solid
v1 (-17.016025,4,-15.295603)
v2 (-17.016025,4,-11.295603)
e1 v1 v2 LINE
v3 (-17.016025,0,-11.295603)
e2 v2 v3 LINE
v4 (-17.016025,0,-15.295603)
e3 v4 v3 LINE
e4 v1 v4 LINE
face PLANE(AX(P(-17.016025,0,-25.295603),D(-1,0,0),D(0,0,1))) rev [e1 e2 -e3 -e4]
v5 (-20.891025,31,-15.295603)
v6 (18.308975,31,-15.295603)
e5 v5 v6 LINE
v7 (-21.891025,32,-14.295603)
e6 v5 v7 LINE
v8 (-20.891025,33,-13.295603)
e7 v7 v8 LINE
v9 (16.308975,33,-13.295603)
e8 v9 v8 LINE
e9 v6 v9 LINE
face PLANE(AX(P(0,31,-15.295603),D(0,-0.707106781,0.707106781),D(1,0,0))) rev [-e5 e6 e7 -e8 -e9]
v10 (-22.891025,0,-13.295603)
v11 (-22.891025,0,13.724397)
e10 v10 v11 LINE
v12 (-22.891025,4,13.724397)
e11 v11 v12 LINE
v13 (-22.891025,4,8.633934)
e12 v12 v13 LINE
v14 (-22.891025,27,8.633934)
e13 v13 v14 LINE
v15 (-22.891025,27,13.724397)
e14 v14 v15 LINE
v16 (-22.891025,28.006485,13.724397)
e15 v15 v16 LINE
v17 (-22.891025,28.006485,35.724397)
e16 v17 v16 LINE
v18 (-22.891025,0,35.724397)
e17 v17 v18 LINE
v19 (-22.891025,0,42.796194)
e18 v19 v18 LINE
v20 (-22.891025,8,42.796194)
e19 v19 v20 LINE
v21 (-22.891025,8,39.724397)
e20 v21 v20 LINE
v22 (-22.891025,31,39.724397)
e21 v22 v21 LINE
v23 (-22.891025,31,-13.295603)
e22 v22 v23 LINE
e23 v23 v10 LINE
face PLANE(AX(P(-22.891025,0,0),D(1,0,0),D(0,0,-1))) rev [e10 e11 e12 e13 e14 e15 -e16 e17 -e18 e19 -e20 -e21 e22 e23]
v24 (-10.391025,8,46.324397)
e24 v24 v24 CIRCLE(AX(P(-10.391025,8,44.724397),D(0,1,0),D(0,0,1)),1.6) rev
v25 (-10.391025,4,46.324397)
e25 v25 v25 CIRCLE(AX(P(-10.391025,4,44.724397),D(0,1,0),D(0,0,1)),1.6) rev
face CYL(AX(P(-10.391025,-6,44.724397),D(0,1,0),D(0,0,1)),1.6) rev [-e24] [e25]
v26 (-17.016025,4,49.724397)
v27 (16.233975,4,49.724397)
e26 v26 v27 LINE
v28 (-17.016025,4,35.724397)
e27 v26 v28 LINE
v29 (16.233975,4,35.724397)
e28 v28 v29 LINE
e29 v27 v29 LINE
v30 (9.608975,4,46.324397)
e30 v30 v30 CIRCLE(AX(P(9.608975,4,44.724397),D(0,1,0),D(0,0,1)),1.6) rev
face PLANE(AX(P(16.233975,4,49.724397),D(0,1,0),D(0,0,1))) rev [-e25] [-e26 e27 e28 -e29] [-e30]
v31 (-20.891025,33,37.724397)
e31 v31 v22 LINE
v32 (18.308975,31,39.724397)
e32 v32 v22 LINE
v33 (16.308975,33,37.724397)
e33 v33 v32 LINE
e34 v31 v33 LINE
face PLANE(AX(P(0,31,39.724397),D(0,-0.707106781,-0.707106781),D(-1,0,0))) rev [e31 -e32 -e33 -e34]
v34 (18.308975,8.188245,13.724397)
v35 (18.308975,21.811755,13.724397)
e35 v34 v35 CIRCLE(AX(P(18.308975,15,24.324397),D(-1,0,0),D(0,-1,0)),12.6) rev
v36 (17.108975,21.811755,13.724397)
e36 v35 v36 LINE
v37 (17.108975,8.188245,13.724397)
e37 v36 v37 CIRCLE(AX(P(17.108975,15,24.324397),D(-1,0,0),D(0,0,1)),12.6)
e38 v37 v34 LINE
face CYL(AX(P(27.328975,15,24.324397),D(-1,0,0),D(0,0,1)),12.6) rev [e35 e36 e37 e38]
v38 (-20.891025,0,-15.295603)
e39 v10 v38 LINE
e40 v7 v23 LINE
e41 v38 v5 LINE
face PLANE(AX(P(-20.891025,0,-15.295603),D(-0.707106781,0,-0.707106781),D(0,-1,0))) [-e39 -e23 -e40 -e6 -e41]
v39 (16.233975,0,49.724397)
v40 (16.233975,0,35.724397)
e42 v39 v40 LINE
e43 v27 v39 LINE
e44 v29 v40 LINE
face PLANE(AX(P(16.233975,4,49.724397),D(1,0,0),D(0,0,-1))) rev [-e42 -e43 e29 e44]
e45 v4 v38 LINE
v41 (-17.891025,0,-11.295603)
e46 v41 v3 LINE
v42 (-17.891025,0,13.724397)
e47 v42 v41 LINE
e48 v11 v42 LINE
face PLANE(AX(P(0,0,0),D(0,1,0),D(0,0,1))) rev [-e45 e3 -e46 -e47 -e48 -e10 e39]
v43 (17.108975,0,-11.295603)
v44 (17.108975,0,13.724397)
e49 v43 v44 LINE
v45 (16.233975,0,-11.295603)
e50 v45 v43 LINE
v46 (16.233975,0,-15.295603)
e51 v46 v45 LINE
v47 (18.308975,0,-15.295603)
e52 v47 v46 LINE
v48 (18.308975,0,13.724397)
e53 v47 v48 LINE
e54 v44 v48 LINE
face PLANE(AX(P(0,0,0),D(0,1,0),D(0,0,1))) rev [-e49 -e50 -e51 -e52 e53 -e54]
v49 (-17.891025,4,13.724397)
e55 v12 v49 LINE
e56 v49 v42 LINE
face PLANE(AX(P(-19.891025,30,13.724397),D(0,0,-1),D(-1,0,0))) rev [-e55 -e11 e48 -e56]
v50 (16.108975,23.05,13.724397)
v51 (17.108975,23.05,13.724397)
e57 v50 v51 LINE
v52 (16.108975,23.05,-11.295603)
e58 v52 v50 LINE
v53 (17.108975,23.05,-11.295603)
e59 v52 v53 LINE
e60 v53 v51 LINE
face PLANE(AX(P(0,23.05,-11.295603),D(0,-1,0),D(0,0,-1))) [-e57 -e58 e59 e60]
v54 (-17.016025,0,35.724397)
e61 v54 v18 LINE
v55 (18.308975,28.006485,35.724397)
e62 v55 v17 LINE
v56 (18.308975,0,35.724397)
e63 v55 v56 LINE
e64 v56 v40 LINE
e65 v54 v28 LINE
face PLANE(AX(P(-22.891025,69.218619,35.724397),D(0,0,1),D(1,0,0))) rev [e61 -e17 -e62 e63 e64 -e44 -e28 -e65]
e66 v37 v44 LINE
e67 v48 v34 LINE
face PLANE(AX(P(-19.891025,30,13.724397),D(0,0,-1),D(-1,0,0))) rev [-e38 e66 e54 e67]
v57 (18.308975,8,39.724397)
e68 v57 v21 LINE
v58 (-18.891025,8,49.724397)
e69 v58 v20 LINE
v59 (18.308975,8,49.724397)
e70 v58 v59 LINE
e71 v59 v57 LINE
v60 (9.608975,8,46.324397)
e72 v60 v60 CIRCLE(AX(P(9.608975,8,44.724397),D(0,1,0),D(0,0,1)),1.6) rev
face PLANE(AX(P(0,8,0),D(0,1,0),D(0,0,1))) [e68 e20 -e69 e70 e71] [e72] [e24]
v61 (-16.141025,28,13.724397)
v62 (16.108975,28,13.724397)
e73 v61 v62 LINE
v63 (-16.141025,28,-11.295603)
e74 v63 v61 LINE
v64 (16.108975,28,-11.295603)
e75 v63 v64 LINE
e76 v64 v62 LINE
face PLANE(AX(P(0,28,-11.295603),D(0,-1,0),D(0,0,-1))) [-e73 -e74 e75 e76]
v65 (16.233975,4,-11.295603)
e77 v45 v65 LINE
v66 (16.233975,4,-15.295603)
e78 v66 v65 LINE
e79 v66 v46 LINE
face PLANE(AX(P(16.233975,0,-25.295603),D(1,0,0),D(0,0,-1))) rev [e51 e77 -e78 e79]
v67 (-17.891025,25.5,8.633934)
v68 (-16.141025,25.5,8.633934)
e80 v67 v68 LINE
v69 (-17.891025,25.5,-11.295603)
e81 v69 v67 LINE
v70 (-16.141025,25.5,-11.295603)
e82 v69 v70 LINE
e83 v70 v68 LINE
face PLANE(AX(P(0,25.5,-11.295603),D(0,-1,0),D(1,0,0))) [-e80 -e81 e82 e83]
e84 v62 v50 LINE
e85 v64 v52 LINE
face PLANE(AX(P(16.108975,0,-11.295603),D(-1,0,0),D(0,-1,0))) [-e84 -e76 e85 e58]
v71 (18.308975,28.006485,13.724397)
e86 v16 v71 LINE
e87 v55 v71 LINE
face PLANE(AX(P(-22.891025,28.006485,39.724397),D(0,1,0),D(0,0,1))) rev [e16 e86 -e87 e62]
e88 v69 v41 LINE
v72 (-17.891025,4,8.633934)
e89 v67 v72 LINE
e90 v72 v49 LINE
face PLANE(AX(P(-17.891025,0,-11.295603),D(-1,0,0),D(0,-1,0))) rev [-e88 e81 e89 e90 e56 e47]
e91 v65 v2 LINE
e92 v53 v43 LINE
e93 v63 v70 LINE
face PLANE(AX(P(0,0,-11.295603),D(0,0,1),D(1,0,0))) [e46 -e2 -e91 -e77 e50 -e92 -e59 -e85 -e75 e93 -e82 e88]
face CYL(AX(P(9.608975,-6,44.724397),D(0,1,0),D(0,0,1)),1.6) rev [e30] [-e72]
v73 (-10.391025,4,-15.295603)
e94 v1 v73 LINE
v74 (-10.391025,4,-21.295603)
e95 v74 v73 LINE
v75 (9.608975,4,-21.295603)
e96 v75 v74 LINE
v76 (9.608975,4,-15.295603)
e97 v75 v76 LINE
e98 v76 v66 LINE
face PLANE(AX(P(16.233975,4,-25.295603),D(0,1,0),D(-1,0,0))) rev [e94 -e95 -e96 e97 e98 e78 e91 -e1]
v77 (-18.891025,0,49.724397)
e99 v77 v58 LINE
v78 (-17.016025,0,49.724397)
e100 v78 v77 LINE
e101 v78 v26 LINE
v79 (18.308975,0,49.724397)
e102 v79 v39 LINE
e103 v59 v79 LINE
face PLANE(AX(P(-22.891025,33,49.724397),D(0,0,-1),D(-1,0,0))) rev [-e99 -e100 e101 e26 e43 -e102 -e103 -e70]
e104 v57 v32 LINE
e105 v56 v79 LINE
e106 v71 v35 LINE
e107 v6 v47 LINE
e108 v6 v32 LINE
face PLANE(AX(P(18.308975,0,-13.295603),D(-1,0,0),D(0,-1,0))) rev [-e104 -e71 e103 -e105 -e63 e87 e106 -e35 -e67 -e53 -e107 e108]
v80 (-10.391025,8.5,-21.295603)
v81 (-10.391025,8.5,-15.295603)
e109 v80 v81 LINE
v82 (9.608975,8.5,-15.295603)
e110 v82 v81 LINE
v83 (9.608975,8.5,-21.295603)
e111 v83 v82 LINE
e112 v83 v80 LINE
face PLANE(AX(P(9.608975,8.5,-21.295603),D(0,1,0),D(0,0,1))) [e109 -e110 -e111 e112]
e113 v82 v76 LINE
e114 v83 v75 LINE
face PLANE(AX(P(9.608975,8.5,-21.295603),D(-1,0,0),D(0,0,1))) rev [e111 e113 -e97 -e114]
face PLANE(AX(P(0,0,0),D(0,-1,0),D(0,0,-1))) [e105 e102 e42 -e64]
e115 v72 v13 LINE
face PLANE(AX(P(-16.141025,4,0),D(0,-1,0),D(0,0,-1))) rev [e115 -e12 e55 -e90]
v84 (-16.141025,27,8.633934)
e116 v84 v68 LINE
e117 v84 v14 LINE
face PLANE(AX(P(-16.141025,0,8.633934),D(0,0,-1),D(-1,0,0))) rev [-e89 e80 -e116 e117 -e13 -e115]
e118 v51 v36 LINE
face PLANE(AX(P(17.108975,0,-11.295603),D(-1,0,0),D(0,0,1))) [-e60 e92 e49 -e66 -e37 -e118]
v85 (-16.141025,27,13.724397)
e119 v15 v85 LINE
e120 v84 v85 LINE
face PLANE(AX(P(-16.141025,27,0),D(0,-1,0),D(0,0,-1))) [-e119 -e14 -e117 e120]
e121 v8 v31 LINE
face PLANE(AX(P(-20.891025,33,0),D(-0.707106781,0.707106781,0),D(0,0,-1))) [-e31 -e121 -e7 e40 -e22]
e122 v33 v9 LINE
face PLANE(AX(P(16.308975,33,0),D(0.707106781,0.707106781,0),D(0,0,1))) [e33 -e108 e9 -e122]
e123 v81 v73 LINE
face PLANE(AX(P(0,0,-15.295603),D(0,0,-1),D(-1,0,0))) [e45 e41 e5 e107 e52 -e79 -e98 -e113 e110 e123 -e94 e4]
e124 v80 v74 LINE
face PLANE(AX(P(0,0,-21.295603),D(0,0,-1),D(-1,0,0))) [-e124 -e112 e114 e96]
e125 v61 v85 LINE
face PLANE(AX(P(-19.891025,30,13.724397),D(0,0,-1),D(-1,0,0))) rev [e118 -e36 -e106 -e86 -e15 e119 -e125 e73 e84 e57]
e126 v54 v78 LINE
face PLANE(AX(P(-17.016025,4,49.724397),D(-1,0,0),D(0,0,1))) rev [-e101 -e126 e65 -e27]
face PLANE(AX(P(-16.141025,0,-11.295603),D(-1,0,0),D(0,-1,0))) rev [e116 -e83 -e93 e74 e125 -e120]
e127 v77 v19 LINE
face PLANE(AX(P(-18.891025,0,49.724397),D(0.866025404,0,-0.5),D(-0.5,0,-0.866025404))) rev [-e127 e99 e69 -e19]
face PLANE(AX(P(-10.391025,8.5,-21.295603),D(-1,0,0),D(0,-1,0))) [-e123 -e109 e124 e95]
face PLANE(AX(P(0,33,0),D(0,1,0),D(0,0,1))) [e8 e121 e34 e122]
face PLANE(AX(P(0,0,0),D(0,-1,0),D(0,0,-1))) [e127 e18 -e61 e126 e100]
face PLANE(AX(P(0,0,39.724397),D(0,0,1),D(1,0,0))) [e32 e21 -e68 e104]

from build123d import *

# Parameters (mm, degrees)
SKETCH1_W                = 39
SKETCH1_H                = 49.22
BOSS_EXTRUDE2_DEPTH      = 30
SKETCH3_W                = 1.75
SKETCH3_H                = 20
SKETCH3_W_2              = 1
SKETCH3_H_2              = 15.1
CUT_EXTRUDE3_DEPTH       = 47.22
CUT_EXTRUDE4_DEPTH       = 47.22
CUT_EXTRUDE5_DEPTH       = 3.75
SKETCH9_W                = 22.2
SKETCH9_H                = 30
CUT_EXTRUDE7_DEPTH       = 61.922592565
SKETCH11_W               = 0.8
SKETCH11_H               = 21.811754546
SKETCH11_H_2             = 8.188245454
CUT_EXTRUDE8_DEPTH       = 46.008146799
SKETCH12_W               = 23
SKETCH12_H               = 2.5
BOSS_EXTRUDE3_DEPTH      = 3
SKETCH13_W               = 23
SKETCH13_H               = 2.5
BOSS_EXTRUDE4_DEPTH      = 3
BOSS_EXTRUDE5_REACH      = 51.909
SKETCH14_W               = 27.02
SKETCH14_H               = 3
SKETCH15_W               = 30.25
SKETCH15_H               = 3
CUT_EXTRUDE9_DEPTH       = 25.02
SKETCH16_W               = 30.25
SKETCH16_H               = 3
CUT_EXTRUDE10_DEPTH      = 46.276919382
SKETCH24_W               = 23
SKETCH24_H               = 2.5
BOSS_EXTRUDE8_DEPTH      = 6
BOSS_EXTRUDE9_DEPTH      = 3
SKETCH26_W               = 41.2
SKETCH26_H               = 27.02
BOSS_EXTRUDE10_DEPTH     = 3
SKETCH29_W               = 4.264424859
SKETCH29_H               = 26.447816837
CUT_EXTRUDE14_DEPTH      = 41.905994632
SKETCH30_W               = 3.981396999
SKETCH30_H               = 33.655588154
CUT_EXTRUDE15_DEPTH      = 40.425282457
BOSS_EXTRUDE15_DEPTH     = 2
BOSS_EXTRUDE16_DEPTH     = 2
SKETCH36_W               = 41.2
SKETCH36_H               = 4.993514727
BOSS_EXTRUDE17_DEPTH     = 26
SKETCH37_W               = 41.2
SKETCH37_H               = 5
BOSS_EXTRUDE18_DEPTH     = 28.006485273
SKETCH38_W               = 41.2
SKETCH38_H               = 5
BOSS_EXTRUDE19_DEPTH     = 20
BOSS_EXTRUDE21_DEPTH     = 5
SKETCH40_R               = 2
CUT_EXTRUDE16_DEPTH      = 78.060934741
BOSS_EXTRUDE22_DEPTH     = 10
SKETCH42_W               = 33.25
SKETCH42_H               = 4
CUT_EXTRUDE17_DEPTH      = 89.632791503
SKETCH43_W               = 30
SKETCH43_H               = 5
CUT_EXTRUDE19_DEPTH      = 10
SKETCH44_W               = 20
SKETCH44_H               = 4.5
BOSS_EXTRUDE23_DEPTH     = 6
SKETCH45_W               = 41.2
SKETCH45_H               = 15
CUT_EXTRUDE20_DEPTH      = 3
SKETCH46_W               = 41.2
SKETCH46_H               = 16.207061994
CUT_EXTRUDE21_DEPTH      = 80.015110347
SKETCH47_W               = 41.2
SKETCH47_H               = 10
BOSS_EXTRUDE24_DEPTH     = 3
SKETCH48_W               = 6
SKETCH48_H               = 25
SKETCH48_W_2             = 3
CUT_EXTRUDE22_DEPTH      = 66.095752287
SKETCH50_W               = 33.25
SKETCH50_H               = 1
CUT_EXTRUDE23_DEPTH      = 69.929234935
SKETCH51_W               = 5.875
SKETCH51_H               = 15
SKETCH51_W_2             = 2.075
BOSS_EXTRUDE25_DEPTH     = 3
CUT_EXTRUDE24_DEPTH      = 10
CUT_EXTRUDE24_DEPTH_BACK = 62.947676833
SKETCH54_W               = 41.2
SKETCH54_H               = 1
CUT_EXTRUDE25_DEPTH      = 28.006485273
CHAMFER1_SIZE            = 2
CUT_EXTRUDE28_DEPTH      = 61.179021802


with BuildPart() as part:
    # Sketch1 → Boss-Extrude2 (new body)
    with BuildSketch(Plane(origin=(0, 0, 0), x_dir=(1, 0, 0), z_dir=(0, 1, 0))):
        with Locations((-0.391025069, -11.314396792)):
            Rectangle(SKETCH1_W, SKETCH1_H)
    extrude(amount=BOSS_EXTRUDE2_DEPTH)

    # Sketch3 → Cut-Extrude3 (cut)
    with BuildSketch(Plane.XY.offset(35.924396792)):
        Polygon((16.108974931, 23.05), (16.108974931, 28), (-16.141025069, 28), (-16.141025069, 25.5), (-16.141025069, 5.5), (-16.141025069, 0), (16.108974931, 0), (16.108974931, 7.95), align=None)
        with Locations((-17.016025069, 15.5)):
            Rectangle(SKETCH3_W, SKETCH3_H)
        with Locations((16.608974931, 15.5)):
            Rectangle(SKETCH3_W_2, SKETCH3_H_2)
    extrude(amount=-CUT_EXTRUDE3_DEPTH, mode=Mode.SUBTRACT)

    # Sketch7 → Cut-Extrude4 (cut)
    with BuildSketch(Plane.ZY.offset(19.891025069)):
        with BuildLine():
            ThreePointArc((11.724396792, 15), (24.324396792, 2.4), (36.924396792, 15))
            ThreePointArc((36.924396792, 15), (24.324396792, 27.6), (11.724396792, 15))
        make_face()
    extrude(amount=-CUT_EXTRUDE4_DEPTH, mode=Mode.SUBTRACT)

    # Sketch8 → Cut-Extrude5 (cut)
    with BuildSketch(Plane.ZY.offset(19.891025069)):
        with BuildLine():
            Line((35.924396792, 30), (17.633933867, 30))
            Line((17.633933867, 30), (17.633933867, 27))
            Line((17.633933867, 27), (8.633933867, 27))
            Line((8.633933867, 27), (8.633933867, 4))
            Line((8.633933867, 4), (17.633933867, 4))
            Line((17.633933867, 4), (17.633933867, 0))
            Line((17.633933867, 0), (35.924396792, 0))
            Line((35.924396792, 0), (35.924396792, 10.08065045))
            ThreePointArc((35.924396792, 10.08065045), (11.724396792, 15), (35.924396792, 19.91934955))
            Line((35.924396792, 19.91934955), (35.924396792, 30))
        make_face()
    extrude(amount=-CUT_EXTRUDE5_DEPTH, mode=Mode.SUBTRACT)

    # Sketch9 → Cut-Extrude7 (cut, through all)
    with BuildSketch(Plane(origin=(19.108974931, 0, 0), x_dir=(0, 0, -1), z_dir=(1, 0, 0))):
        with Locations((-24.824396792, 15)):
            Rectangle(SKETCH9_W, SKETCH9_H)
    extrude(amount=-CUT_EXTRUDE7_DEPTH, mode=Mode.SUBTRACT)

    # Sketch11 → Cut-Extrude8 (cut, through all)
    with BuildSketch(Plane.XY.offset(13.724396792)):
        with Locations((18.708974931, 19.094122727)):
            Rectangle(SKETCH11_W, SKETCH11_H)
        with Locations((18.708974931, 4.094122727)):
            Rectangle(SKETCH11_W, SKETCH11_H_2)
    extrude(amount=-CUT_EXTRUDE8_DEPTH, mode=Mode.SUBTRACT)

    # Sketch12 → Boss-Extrude3 (add)
    with BuildSketch(Plane(origin=(18.308974931, 0, 0), x_dir=(0, 0, -1), z_dir=(1, 0, 0))):
        with Locations((1.795603208, 1.25)):
            Rectangle(SKETCH12_W, SKETCH12_H)
    extrude(amount=BOSS_EXTRUDE3_DEPTH)

    # Sketch13 → Boss-Extrude4 (add)
    with BuildSketch(Plane.ZY.offset(19.891025069)):
        with Locations((-1.795603208, 1.25)):
            Rectangle(SKETCH13_W, SKETCH13_H)
    extrude(amount=BOSS_EXTRUDE4_DEPTH)

    # Sketch14 → Boss-Extrude5 (add, up to next)
    with BuildSketch(Plane(origin=(-16.141025069, 0, 0), x_dir=(0, 0, -1), z_dir=(1, 0, 0)), mode=Mode.PRIVATE) as boss_extrude5_sk1:
        with Locations((-0.214396792, 1.5)):
            Rectangle(SKETCH14_W, SKETCH14_H)
    boss_extrude5_tool1 = extrude(boss_extrude5_sk1.sketch, amount=BOSS_EXTRUDE5_REACH, mode=Mode.PRIVATE) - part.part
    add(boss_extrude5_tool1.solids().sort_by_distance((-16.141025, 1.5, 0.214397))[0])

    # Sketch15 → Cut-Extrude9 (cut)
    with BuildSketch(Plane.XY.offset(13.724396792)):
        with Locations((-0.016025069, 1.5)):
            Rectangle(SKETCH15_W, SKETCH15_H)
    extrude(amount=-CUT_EXTRUDE9_DEPTH, mode=Mode.SUBTRACT)

    # Sketch16 → Cut-Extrude10 (cut, through all)
    with BuildSketch(Plane.XY.offset(-11.295603208)):
        with Locations((-0.016025069, 1.5)):
            Rectangle(SKETCH16_W, SKETCH16_H)
    extrude(amount=-CUT_EXTRUDE10_DEPTH, mode=Mode.SUBTRACT)

    # Sketch24 → Boss-Extrude8 (add)
    with BuildSketch(Plane.ZY.offset(22.891025069)):
        with Locations((-1.795603208, 1.25)):
            Rectangle(SKETCH24_W, SKETCH24_H)
    extrude(amount=BOSS_EXTRUDE8_DEPTH)

    # Sketch25 → Boss-Extrude9 (add)
    with BuildSketch(Plane.ZY.offset(19.891025069)):
        Polygon((-13.295603208, 30), (13.724396792, 30), (13.724396792, 27), (8.633933867, 27), (8.633933867, 4), (13.724396792, 4), (13.724396792, 0), (9.704396792, 0), (9.704396792, 2.5), (-13.295603208, 2.5), align=None)
    extrude(amount=BOSS_EXTRUDE9_DEPTH)

    # Sketch26 → Boss-Extrude10 (add)
    with BuildSketch(Plane(origin=(0, 30, 0), x_dir=(1, 0, 0), z_dir=(0, 1, 0))):
        with Locations((-2.291025069, -0.214396792)):
            Rectangle(SKETCH26_W, SKETCH26_H)
    extrude(amount=BOSS_EXTRUDE10_DEPTH)

    # Sketch29 → Cut-Extrude14 (cut, through all)
    with BuildSketch(Plane.XZ.offset(-25.5)):
        with Locations((-15.75881264, 1.92830521)):
            Rectangle(SKETCH29_W, SKETCH29_H)
    extrude(amount=CUT_EXTRUDE14_DEPTH, mode=Mode.SUBTRACT)

    # Sketch30 → Cut-Extrude15 (cut, through all)
    with BuildSketch(Plane(origin=(0, 23.05, 0), x_dir=(-1, 0, 0), z_dir=(0, -1, 0))):
        with Locations((-15.118276432, -5.532190869)):
            Rectangle(SKETCH30_W, SKETCH30_H)
    extrude(amount=CUT_EXTRUDE15_DEPTH, mode=Mode.SUBTRACT)

    # Sketch34 → Boss-Extrude15 (add)
    with BuildSketch(Plane(origin=(0, 0, -13.295603208), x_dir=(-1, 0, 0), z_dir=(0, 0, -1))):
        Polygon((-18.308974931, 33), (-18.308974931, 2.5), (-21.308974931, 2.5), (-21.308974931, 0), (28.891025069, 0), (28.891025069, 2.5), (22.891025069, 2.5), (22.891025069, 33), align=None)
    extrude(amount=-BOSS_EXTRUDE15_DEPTH)

    # Sketch35 → Boss-Extrude16 (add)
    with BuildSketch(Plane(origin=(0, 0, -13.295603208), x_dir=(-1, 0, 0), z_dir=(0, 0, -1))):
        Polygon((-18.308974931, 33), (-18.308974931, 2.5), (-21.308974931, 2.5), (-21.308974931, 0), (28.891025069, 0), (28.891025069, 2.5), (22.891025069, 2.5), (22.891025069, 33), align=None)
    extrude(amount=BOSS_EXTRUDE16_DEPTH)

    # Sketch36 → Boss-Extrude17 (add)
    with BuildSketch(Plane.XY.offset(13.724396792)):
        with Locations((-2.291025069, 30.503242637)):
            Rectangle(SKETCH36_W, SKETCH36_H)
    extrude(amount=BOSS_EXTRUDE17_DEPTH)

    # Sketch37 → Boss-Extrude18 (add)
    with BuildSketch(Plane(origin=(0, 28.006485273, 0), x_dir=(-1, 0, 0), z_dir=(0, -1, 0))):
        with Locations((2.291025069, -37.224396792)):
            Rectangle(SKETCH37_W, SKETCH37_H)
    extrude(amount=BOSS_EXTRUDE18_DEPTH)

    # Sketch38 → Boss-Extrude19 (add)
    with BuildSketch(Plane.XY.offset(39.724396792)):
        with Locations((-2.291025069, 2.5)):
            Rectangle(SKETCH38_W, SKETCH38_H)
    extrude(amount=BOSS_EXTRUDE19_DEPTH)

    # Sketch39 → Boss-Extrude21 (add)
    with BuildSketch(Plane(origin=(0, 5, 0), x_dir=(1, 0, 0), z_dir=(0, 1, 0))):
        with BuildLine():
            Line((-8.291025069, -59.724396792), (-22.891025069, -59.724396792))
            Line((-22.891025069, -59.724396792), (-4.038597885, -65.464256481))
            ThreePointArc((-4.038597885, -65.464256481), (-7.112095329, -63.296130482), (-8.291025069, -59.724396792))
        make_face()
        with BuildLine():
            ThreePointArc((-8.291025069, -59.724396792), (-7.112095329, -63.296130482), (-4.038597885, -65.464256481))
            ThreePointArc((-4.038597885, -65.464256481), (-2.291025069, -65.724396792), (-0.543452254, -65.464256481))
            ThreePointArc((-0.543452254, -65.464256481), (2.53004519, -63.296130482), (3.708974931, -59.724396792))
            Line((3.708974931, -59.724396792), (-0.291025069, -59.724396792))
            ThreePointArc((-0.291025069, -59.724396792), (-2.291025069, -61.724396792), (-4.291025069, -59.724396792))
            Line((-4.291025069, -59.724396792), (-8.291025069, -59.724396792))
        make_face()
        with BuildLine():
            ThreePointArc((3.708974931, -59.724396792), (-2.291025069, -53.724396792), (-8.291025069, -59.724396792))
            Line((-8.291025069, -59.724396792), (-4.291025069, -59.724396792))
            ThreePointArc((-4.291025069, -59.724396792), (-2.291025069, -57.724396792), (-0.291025069, -59.724396792))
            Line((-0.291025069, -59.724396792), (3.708974931, -59.724396792))
        make_face()
        with BuildLine():
            ThreePointArc((3.708974931, -59.724396792), (2.53004519, -63.296130482), (-0.543452254, -65.464256481))
            Line((-0.543452254, -65.464256481), (18.308974931, -59.724396792))
            Line((18.308974931, -59.724396792), (3.708974931, -59.724396792))
        make_face()
    extrude(amount=-BOSS_EXTRUDE21_DEPTH)

    # Sketch40 → Cut-Extrude16 (cut, through all)
    with BuildSketch(Plane(origin=(0, 5, 0), x_dir=(1, 0, 0), z_dir=(0, 1, 0))):
        with Locations(Location((-2.291025069, -59.724396792, 0), (0, 0, 270))):
            Circle(SKETCH40_R)
    extrude(amount=-CUT_EXTRUDE16_DEPTH, mode=Mode.SUBTRACT)

    # Fillet1
    # the kernel refuses this chamfer: 2 mm, written as the material it takes off along each edge
    with BuildSketch(Plane(origin=(-22.891025069, 33, -20.438969184), x_dir=(-0.027495876610585647, -0.9996219169112968, 0), z_dir=(0, 0, 1))) as fillet1_piece_1:
        with BuildLine():
            Line((2.05734639, 0), (-0.11309431, 2.054235587))
            Line((-0.11309431, 2.054235587), (-0.153079186, 2.053135752))
            ThreePointArc((-0.153079186, 2.053135752), (-0.068258454, 1.026795659), (-0.039984877, -0.001099835))
            Line((-0.039984877, -0.001099835), (0.001099835, -0.039984877))
            ThreePointArc((0.001099835, -0.039984877), (1.028995329, -0.011711299), (2.058446225, -0.039984877))
            Line((2.058446225, -0.039984877), (2.05734639, 0))
        make_face()
    extrude(amount=65.306731952, mode=Mode.SUBTRACT)
    with BuildSketch(Plane(origin=(18.308974931, 33, -20.438969184), x_dir=(0.027495876610585647, -0.9996219169112968, 0), z_dir=(0, 0, 1))) as fillet1_piece_2:
        with BuildLine():
            Line((2.05734639, 0), (-0.11309431, -2.054235587))
            Line((-0.11309431, -2.054235587), (-0.153079186, -2.053135752))
            ThreePointArc((-0.153079186, -2.053135752), (-0.068258454, -1.026795659), (-0.039984877, 0.001099835))
            Line((-0.039984877, 0.001099835), (0.001099835, 0.039984877))
            ThreePointArc((0.001099835, 0.039984877), (1.028995329, 0.011711299), (2.058446225, 0.039984877))
            Line((2.058446225, 0.039984877), (2.05734639, 0))
        make_face()
    extrude(amount=65.306731952, mode=Mode.SUBTRACT)
    with BuildSketch(Plane(origin=(-28.034391045, 33, -15.295603208), x_dir=(0, -0.9996219169112968, -0.02749587661058651), z_dir=(1, 0, 0)), Plane(origin=(-28.034391045, 33, 39.724396792), x_dir=(0, 0.027495876610585647, -0.9996219169112968), z_dir=(1, 0, 0))) as fillet1_piece_3:
        with BuildLine():
            Line((2.05734639, 0), (-0.11309431, -2.054235587))
            Line((-0.11309431, -2.054235587), (-0.153079186, -2.053135752))
            ThreePointArc((-0.153079186, -2.053135752), (-0.068258454, -1.026795659), (-0.039984877, 0.001099835))
            Line((-0.039984877, 0.001099835), (0.001099835, 0.039984877))
            ThreePointArc((0.001099835, 0.039984877), (1.028995329, 0.011711299), (2.058446225, 0.039984877))
            Line((2.058446225, 0.039984877), (2.05734639, 0))
        make_face()
    extrude(amount=51.486731952, mode=Mode.SUBTRACT)
    with BuildSketch(Plane(origin=(-22.891025069, 8.866831055, 59.724396792), x_dir=(-0.030789498682027062, 0, -0.9995258909957808), z_dir=(0, -1, 0)), Plane(origin=(18.308974931, -3.866831055, 59.724396792), x_dir=(0.030789498682027062, 0, -0.9995258909957808), z_dir=(0, 1, 0))) as fillet1_piece_4:
        with BuildLine():
            Line((1.546732422, 0), (-0.540723907, 1.449137275))
            Line((-0.540723907, 1.449137275), (-0.578612783, 1.436314131))
            ThreePointArc((-0.578612783, 1.436314131), (-0.285696, 0.719378969), (-0.037888877, -0.012823145))
            Line((-0.037888877, -0.012823145), (0.00123158, -0.039981036))
            ThreePointArc((0.00123158, -0.039981036), (0.773864645, -0.016180767), (1.547964002, -0.039981036))
            Line((1.547964002, -0.039981036), (1.546732422, 0))
        make_face()
    extrude(amount=12.73366211, mode=Mode.SUBTRACT)

    # Sketch41 → Boss-Extrude22 (add)
    with BuildSketch(Plane(origin=(0, 0, -15.295603208), x_dir=(-1, 0, 0), z_dir=(0, 0, -1))):
        Polygon((17.291025069, 5), (2.291025069, 5), (-12.708974931, 5), (-12.708974931, 0), (2.291025069, 0), (17.291025069, 0), align=None)
    extrude(amount=BOSS_EXTRUDE22_DEPTH)

    # Sketch42 → Cut-Extrude17 (cut, through all)
    with BuildSketch(Plane.XY.offset(-11.295603208)):
        with Locations((-0.391025069, 2)):
            Rectangle(SKETCH42_W, SKETCH42_H)
    extrude(amount=-CUT_EXTRUDE17_DEPTH, mode=Mode.SUBTRACT)

    # Sketch43 → Cut-Extrude19 (cut)
    with BuildSketch(Plane(origin=(0, 0, -25.295603208), x_dir=(-1, 0, 0), z_dir=(0, 0, -1))):
        with Locations((2.291025069, 2.5)):
            Rectangle(SKETCH43_W, SKETCH43_H)
    extrude(amount=-CUT_EXTRUDE19_DEPTH, mode=Mode.SUBTRACT)

    # Sketch44 → Boss-Extrude23 (add)
    with BuildSketch(Plane(origin=(0, 0, -15.295603208), x_dir=(-1, 0, 0), z_dir=(0, 0, -1))):
        with Locations((0.391025069, 6.25)):
            Rectangle(SKETCH44_W, SKETCH44_H)
    extrude(amount=BOSS_EXTRUDE23_DEPTH)

    # Sketch45 → Cut-Extrude20 (cut)
    with BuildSketch(Plane(origin=(0, 0, 0), x_dir=(-1, 0, 0), z_dir=(0, -1, 0))):
        with Locations((2.291025069, -42.224396792)):
            Rectangle(SKETCH45_W, SKETCH45_H)
    extrude(amount=-CUT_EXTRUDE20_DEPTH, mode=Mode.SUBTRACT)

    # Sketch46 → Cut-Extrude21 (cut, through all)
    with BuildSketch(Plane(origin=(0, 0, 0), x_dir=(-1, 0, 0), z_dir=(0, -1, 0))):
        with Locations((2.291025069, -57.827927789)):
            Rectangle(SKETCH46_W, SKETCH46_H)
    extrude(amount=-CUT_EXTRUDE21_DEPTH, mode=Mode.SUBTRACT)

    # Sketch47 → Boss-Extrude24 (add)
    with BuildSketch(Plane(origin=(0, 5, 0), x_dir=(1, 0, 0), z_dir=(0, 1, 0))):
        with Locations((-2.291025069, -44.724396792)):
            Rectangle(SKETCH47_W, SKETCH47_H)
    extrude(amount=BOSS_EXTRUDE24_DEPTH)

    # Sketch48 → Cut-Extrude22 (cut, through all)
    with BuildSketch(Plane(origin=(0, 2.5, 0), x_dir=(1, 0, 0), z_dir=(0, 1, 0))):
        with Locations((-25.891025069, 2.795603208)):
            Rectangle(SKETCH48_W, SKETCH48_H)
        with Locations((19.808974931, 2.795603208)):
            Rectangle(SKETCH48_W_2, SKETCH48_H)
    extrude(amount=-CUT_EXTRUDE22_DEPTH, mode=Mode.SUBTRACT)

    # Sketch50 → Cut-Extrude23 (cut, through all)
    with BuildSketch(Plane(origin=(0, 0, 34.724396792), x_dir=(-1, 0, 0), z_dir=(0, 0, -1))):
        with Locations((0.391025069, 3.5)):
            Rectangle(SKETCH50_W, SKETCH50_H)
    extrude(amount=-CUT_EXTRUDE23_DEPTH, mode=Mode.SUBTRACT)

    # Sketch51 → Boss-Extrude25 (add)
    with BuildSketch(Plane.XZ.offset(-3)):
        with Locations((-19.953525069, 42.224396792)):
            Rectangle(SKETCH51_W, SKETCH51_H)
        with Locations((17.271474931, 42.224396792)):
            Rectangle(SKETCH51_W_2, SKETCH51_H)
    extrude(amount=BOSS_EXTRUDE25_DEPTH)

    # Sketch52 → Cut-Extrude24 (cut, two sides: drawn at the far end of the back side and taken through both)
    with BuildSketch(Plane(origin=(0, 4, 0), x_dir=(-1, 0, 0), z_dir=(0, -1, 0)).offset(-CUT_EXTRUDE24_DEPTH_BACK)):
        with BuildLine():
            ThreePointArc((8.791025069, -44.724396792), (9.259654219, -45.855767642), (10.391025069, -46.324396792))
            Line((10.391025069, -46.324396792), (10.391025069, -44.724396792))
            Line((10.391025069, -44.724396792), (8.791025069, -44.724396792))
        make_face()
        with BuildLine():
            Line((10.391025069, -44.724396792), (10.391025069, -46.324396792))
            ThreePointArc((10.391025069, -46.324396792), (11.522395919, -45.855767642), (11.991025069, -44.724396792))
            ThreePointArc((11.991025069, -44.724396792), (10.391025069, -43.124396792), (8.791025069, -44.724396792))
            Line((8.791025069, -44.724396792), (10.391025069, -44.724396792))
        make_face()
        with BuildLine():
            ThreePointArc((-8.008974931, -44.724396792), (-10.740345781, -43.593025942), (-9.608974931, -46.324396792))
            Line((-9.608974931, -46.324396792), (-9.608974931, -44.724396792))
            Line((-9.608974931, -44.724396792), (-8.008974931, -44.724396792))
        make_face()
        with BuildLine():
            Line((-9.608974931, -44.724396792), (-9.608974931, -46.324396792))
            ThreePointArc((-9.608974931, -46.324396792), (-8.477604081, -45.855767642), (-8.008974931, -44.724396792))
            Line((-8.008974931, -44.724396792), (-9.608974931, -44.724396792))
        make_face()
    extrude(amount=CUT_EXTRUDE24_DEPTH + CUT_EXTRUDE24_DEPTH_BACK, mode=Mode.SUBTRACT)

    # Sketch54 → Cut-Extrude25 (cut)
    with BuildSketch(Plane(origin=(0, 0, 0), x_dir=(-1, 0, 0), z_dir=(0, -1, 0))):
        with Locations((2.291025069, -35.224396792)):
            Rectangle(SKETCH54_W, SKETCH54_H)
    extrude(amount=-CUT_EXTRUDE25_DEPTH, mode=Mode.SUBTRACT)

    # Chamfer1
    chamfer1_edges = [part.edges().sort_by_distance(p)[0] for p in [
        (-22.891025069, 15.5, -15.295603208),
    ]]
    chamfer(chamfer1_edges, length=CHAMFER1_SIZE)

    # Sketch55 → Cut-Extrude28 (cut, through all)
    with BuildSketch(Plane(origin=(0, 8, 0), x_dir=(1, 0, 0), z_dir=(0, 1, 0))):
        Polygon((-22.891025069, -42.796193562), (-22.891025069, -49.724396792), (-18.891025069, -49.724396792), align=None)
    extrude(amount=-CUT_EXTRUDE28_DEPTH, mode=Mode.SUBTRACT)


solid = part.part
